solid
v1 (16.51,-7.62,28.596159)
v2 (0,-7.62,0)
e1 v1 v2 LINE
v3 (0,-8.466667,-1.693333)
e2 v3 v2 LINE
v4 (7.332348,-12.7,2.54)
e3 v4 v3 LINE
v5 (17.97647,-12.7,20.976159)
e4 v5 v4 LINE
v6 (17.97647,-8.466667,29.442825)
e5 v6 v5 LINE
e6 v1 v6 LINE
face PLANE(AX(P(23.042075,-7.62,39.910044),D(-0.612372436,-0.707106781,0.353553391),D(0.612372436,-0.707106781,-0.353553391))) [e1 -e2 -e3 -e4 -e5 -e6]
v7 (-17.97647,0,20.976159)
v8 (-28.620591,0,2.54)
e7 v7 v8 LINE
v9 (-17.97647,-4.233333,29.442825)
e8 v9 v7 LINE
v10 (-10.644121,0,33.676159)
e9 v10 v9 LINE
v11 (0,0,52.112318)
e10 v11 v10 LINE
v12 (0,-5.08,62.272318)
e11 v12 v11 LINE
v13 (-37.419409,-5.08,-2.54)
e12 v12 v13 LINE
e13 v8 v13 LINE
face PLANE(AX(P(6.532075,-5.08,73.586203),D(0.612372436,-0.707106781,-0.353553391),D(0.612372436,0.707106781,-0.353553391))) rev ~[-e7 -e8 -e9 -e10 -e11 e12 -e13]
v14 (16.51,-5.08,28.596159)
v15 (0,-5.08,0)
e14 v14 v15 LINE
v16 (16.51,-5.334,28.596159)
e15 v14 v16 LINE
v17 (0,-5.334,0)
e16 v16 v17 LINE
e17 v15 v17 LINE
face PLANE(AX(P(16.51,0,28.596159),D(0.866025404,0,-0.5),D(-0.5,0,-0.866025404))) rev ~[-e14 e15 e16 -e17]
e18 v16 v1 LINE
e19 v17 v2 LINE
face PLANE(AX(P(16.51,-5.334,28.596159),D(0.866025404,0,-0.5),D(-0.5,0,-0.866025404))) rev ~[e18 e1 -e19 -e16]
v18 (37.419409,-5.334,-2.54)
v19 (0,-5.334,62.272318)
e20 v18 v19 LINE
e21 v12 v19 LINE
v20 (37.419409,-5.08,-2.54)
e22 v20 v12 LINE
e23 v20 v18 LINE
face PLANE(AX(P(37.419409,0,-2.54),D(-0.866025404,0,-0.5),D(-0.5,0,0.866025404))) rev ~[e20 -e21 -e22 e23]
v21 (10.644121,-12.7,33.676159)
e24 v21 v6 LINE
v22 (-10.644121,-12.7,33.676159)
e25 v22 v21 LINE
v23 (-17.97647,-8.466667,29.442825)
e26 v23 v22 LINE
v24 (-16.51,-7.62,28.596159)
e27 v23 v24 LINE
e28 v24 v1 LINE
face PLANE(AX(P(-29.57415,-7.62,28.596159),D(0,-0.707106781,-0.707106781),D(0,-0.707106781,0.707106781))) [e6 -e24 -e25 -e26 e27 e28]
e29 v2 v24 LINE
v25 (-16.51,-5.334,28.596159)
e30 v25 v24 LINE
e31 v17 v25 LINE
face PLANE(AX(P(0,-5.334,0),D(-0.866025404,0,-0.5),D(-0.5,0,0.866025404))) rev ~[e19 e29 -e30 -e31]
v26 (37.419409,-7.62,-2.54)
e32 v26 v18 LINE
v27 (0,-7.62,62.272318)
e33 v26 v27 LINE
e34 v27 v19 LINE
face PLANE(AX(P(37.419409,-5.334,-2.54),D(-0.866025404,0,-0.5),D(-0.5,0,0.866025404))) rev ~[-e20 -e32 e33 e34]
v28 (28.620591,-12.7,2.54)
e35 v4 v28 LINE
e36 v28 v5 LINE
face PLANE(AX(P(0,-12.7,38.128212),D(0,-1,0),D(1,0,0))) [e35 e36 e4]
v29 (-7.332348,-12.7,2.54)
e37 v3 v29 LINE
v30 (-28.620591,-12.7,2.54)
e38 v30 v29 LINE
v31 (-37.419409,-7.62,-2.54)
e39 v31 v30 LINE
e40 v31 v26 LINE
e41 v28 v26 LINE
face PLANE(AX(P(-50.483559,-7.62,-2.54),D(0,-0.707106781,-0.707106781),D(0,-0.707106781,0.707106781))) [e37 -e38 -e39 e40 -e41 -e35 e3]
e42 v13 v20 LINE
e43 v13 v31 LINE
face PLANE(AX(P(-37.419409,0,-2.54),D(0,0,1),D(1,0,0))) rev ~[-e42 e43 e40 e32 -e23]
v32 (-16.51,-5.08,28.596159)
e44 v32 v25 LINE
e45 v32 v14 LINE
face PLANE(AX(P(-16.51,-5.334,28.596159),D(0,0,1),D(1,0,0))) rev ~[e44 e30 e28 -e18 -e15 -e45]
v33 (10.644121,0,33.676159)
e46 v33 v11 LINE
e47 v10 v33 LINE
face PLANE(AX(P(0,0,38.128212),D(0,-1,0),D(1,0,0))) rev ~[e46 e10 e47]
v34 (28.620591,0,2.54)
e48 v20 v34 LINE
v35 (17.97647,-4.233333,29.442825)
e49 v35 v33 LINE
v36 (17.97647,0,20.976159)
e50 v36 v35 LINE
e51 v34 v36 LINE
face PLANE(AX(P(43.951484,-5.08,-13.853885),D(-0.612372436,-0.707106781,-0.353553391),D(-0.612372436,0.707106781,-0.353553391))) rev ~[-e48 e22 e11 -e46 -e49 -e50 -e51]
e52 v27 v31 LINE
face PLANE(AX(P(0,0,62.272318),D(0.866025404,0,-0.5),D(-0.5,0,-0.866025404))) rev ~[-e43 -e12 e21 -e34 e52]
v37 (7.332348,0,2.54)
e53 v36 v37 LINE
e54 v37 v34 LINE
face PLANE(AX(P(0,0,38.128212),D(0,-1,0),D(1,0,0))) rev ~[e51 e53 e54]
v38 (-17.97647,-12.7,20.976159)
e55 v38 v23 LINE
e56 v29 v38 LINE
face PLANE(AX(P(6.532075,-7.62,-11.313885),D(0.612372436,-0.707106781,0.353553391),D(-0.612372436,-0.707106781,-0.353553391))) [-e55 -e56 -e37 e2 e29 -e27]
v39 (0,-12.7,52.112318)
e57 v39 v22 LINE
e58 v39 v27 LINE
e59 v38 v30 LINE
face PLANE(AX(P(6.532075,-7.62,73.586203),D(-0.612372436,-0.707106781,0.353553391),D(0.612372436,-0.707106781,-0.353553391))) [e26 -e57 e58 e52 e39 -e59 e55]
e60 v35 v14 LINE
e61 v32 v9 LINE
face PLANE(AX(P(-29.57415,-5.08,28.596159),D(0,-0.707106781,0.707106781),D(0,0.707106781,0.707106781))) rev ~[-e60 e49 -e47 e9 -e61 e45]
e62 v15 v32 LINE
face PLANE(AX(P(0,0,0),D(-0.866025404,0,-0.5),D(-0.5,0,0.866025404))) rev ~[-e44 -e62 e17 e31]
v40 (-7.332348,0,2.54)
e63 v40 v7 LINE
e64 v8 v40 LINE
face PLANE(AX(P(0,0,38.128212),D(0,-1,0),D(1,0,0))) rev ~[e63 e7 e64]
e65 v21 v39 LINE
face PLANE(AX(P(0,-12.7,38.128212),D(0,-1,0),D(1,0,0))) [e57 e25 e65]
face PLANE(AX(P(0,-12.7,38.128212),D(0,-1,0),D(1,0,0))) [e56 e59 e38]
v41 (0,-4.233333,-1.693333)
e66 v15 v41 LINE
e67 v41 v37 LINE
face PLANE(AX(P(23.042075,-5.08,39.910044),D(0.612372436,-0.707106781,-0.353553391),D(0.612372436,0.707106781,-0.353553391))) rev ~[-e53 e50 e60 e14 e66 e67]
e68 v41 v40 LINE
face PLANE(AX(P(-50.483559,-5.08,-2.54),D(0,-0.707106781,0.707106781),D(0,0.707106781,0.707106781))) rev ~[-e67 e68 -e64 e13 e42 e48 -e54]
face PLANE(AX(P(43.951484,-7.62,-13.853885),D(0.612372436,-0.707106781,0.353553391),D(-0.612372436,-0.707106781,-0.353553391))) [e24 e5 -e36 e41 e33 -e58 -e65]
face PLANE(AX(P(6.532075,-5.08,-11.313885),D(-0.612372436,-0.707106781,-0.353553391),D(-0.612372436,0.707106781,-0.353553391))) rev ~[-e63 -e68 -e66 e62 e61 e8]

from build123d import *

# Parameters (mm, degrees)
F1_DEPTH      = 12.7
F2_T1_DEPTH   = 100.9671172602
F2_T3_DEPTH   = 100.9671172602
F2_T5_DEPTH   = 100.9671172602
F2_T10_DEPTH  = 59.1482991577
F2_T16_DEPTH  = 59.1482991577
F2_T22_DEPTH  = 59.1482991577
F2_T28_DEPTH  = 59.1482991577
F2_T34_DEPTH  = 59.1482991577
F2_T40_DEPTH  = 59.1482991577
F2_T47_DEPTH  = 59.1482991577
F2_T52_DEPTH  = 59.1482991577
F2_T60_DEPTH  = 59.1482991577
F2_T65_DEPTH  = 59.1482991577
F2_T73_DEPTH  = 59.1482991577
F2_T78_DEPTH  = 59.1482991577
F2_T86_DEPTH  = 59.1482991577
F2_T91_DEPTH  = 59.1482991577
F2_T99_DEPTH  = 59.1482991577
F2_T104_DEPTH = 59.1482991577
F2_T112_DEPTH = 59.1482991577
F2_T117_DEPTH = 59.1482991577
F3_DEPTH      = 2.286
F4_DEPTH      = 2.286


# Not quite as in the source:
# - a fillet or chamfer that OpenCascade refuses, or shapes differently, is made with other operations: its cross-section is extruded or revolved along the edge and cut away or added


with BuildPart() as f1:
    # F0 (on Front) → F1 (new body)
    with BuildSketch(Plane.XZ):
        Polygon((0, 57.1923176659), (-16.51, 28.596158833), (16.51, 28.596158833), align=None)
        Polygon((-33.02, 0), (0, 0), (-16.51, 28.596158833), align=None)
        Polygon((16.51, 28.596158833), (0, 0), (33.02, 0), align=None)
        Polygon((-37.4194090512, -2.54), (-33.02, 0), (-16.51, 28.596158833), (0, 57.1923176659), (0, 62.2723176659), align=None)
        Polygon((16.51, 28.596158833), (33.02, 0), (37.4194090512, -2.54), (0, 62.2723176659), (0, 57.1923176659), align=None)
        Polygon((33.02, 0), (0, 0), (-33.02, 0), (-37.4194090512, -2.54), (37.4194090512, -2.54), align=None)
    extrude(amount=F1_DEPTH)

    # F2: chamfer of 5.08 on 12 edges, made by hand

    # F2_s2 → F2_t1 (cut)
    with BuildSketch(Plane(origin=(33.496779315, 0, 58.0181236636), x_dir=(0, 1, 0), z_dir=(-0.5, 0, -0.8660254038))):
        Polygon((-7.62, -31.136158833), (-12.7, -26.056158833), (-12.7, -31.136158833), align=None)
        Polygon((-5.08, -31.136158833), (0, -26.056158833), (0, -31.136158833), align=None)
    extrude(amount=F2_T1_DEPTH, mode=Mode.SUBTRACT)

    # F2_s4 → F2_t3 (cut)
    with BuildSketch(Plane(origin=(16.986779315, 0, -29.4219648306), x_dir=(0, 1, 0), z_dir=(-0.5, 0, 0.8660254038))):
        Polygon((-7.62, -31.136158833), (-12.7, -26.056158833), (-12.7, -31.136158833), align=None)
        Polygon((-5.08, -31.136158833), (0, -26.056158833), (0, -31.136158833), align=None)
    extrude(amount=F2_T3_DEPTH, mode=Mode.SUBTRACT)

    # F2_s6 → F2_t5 (cut)
    with BuildSketch(Plane.YZ.offset(-50.4835586301)):
        Polygon((-7.62, -2.54), (-12.7, 2.54), (-12.7, -2.54), align=None)
        Polygon((-5.08, -2.54), (0, 2.54), (0, -2.54), align=None)
    extrude(amount=F2_T5_DEPTH, mode=Mode.SUBTRACT)


with BuildPart() as f2_tool8:
    # F2_s9 → F2_t10 (new body)
    with BuildSketch(Plane(origin=(6.5320747894, 0, -11.3138854141), x_dir=(0, 1, 0), z_dir=(-0.5, 0, 0.8660254038))):
        Polygon((-7.62, 0), (-12.7, 5.08), (-12.7, 0), align=None)
    extrude(amount=F2_T10_DEPTH)

    split(bisect_by=Plane(origin=(0, 0, 0), x_dir=(0, 1, 0), z_dir=(-0.8660254038, 0, 0.5)), keep=Keep.TOP)

    split(bisect_by=Plane.XY.offset(28.596158833), keep=Keep.BOTTOM)


with BuildPart() as f1_1:
    add(f1.part)

    # F2_t7: cut F2_tool8
    add(f2_tool8.part, mode=Mode.SUBTRACT)


with BuildPart() as f2_tool14:
    # F2_s15 → F2_t16 (new body)
    with BuildSketch(Plane.YZ.offset(-29.5741495789)):
        Polygon((-7.62, 28.596158833), (-12.7, 33.676158833), (-12.7, 28.596158833), align=None)
    extrude(amount=F2_T16_DEPTH)

    split(bisect_by=Plane(origin=(0, 0, 0), x_dir=(0, 1, 0), z_dir=(-0.8660254038, 0, 0.5)), keep=Keep.TOP)

    split(bisect_by=Plane(origin=(0, 0, 0), x_dir=(0, 1, 0), z_dir=(0.8660254038, 0, 0.5)), keep=Keep.TOP)


with BuildPart() as f1_2:
    add(f1_1.part)

    # F2_t13: cut F2_tool14
    add(f2_tool14.part, mode=Mode.SUBTRACT)


with BuildPart() as f2_tool20:
    # F2_s21 → F2_t22 (new body)
    with BuildSketch(Plane(origin=(23.0420747894, 0, 39.9100442471), x_dir=(0, 1, 0), z_dir=(-0.5, 0, -0.8660254038))):
        Polygon((-7.62, 0), (-12.7, 5.08), (-12.7, 0), align=None)
    extrude(amount=F2_T22_DEPTH)

    split(bisect_by=Plane(origin=(0, 0, 0), x_dir=(0, 1, 0), z_dir=(0.8660254038, 0, 0.5)), keep=Keep.TOP)

    split(bisect_by=Plane.XY.offset(28.596158833), keep=Keep.BOTTOM)


with BuildPart() as f1_3:
    add(f1_2.part)

    # F2_t19: cut F2_tool20
    add(f2_tool20.part, mode=Mode.SUBTRACT)


with BuildPart() as f2_tool26:
    # F2_s27 → F2_t28 (new body)
    with BuildSketch(Plane(origin=(23.0420747894, 0, 39.9100442471), x_dir=(0, 1, 0), z_dir=(-0.5, 0, -0.8660254038))):
        Polygon((-5.08, 0), (0, 5.08), (0, 0), align=None)
    extrude(amount=F2_T28_DEPTH)

    split(bisect_by=Plane(origin=(0, 0, 0), x_dir=(0, 1, 0), z_dir=(0.8660254038, 0, 0.5)), keep=Keep.TOP)

    split(bisect_by=Plane.XY.offset(28.596158833), keep=Keep.BOTTOM)


with BuildPart() as f1_4:
    add(f1_3.part)

    # F2_t25: cut F2_tool26
    add(f2_tool26.part, mode=Mode.SUBTRACT)


with BuildPart() as f2_tool32:
    # F2_s33 → F2_t34 (new body)
    with BuildSketch(Plane.YZ.offset(-29.5741495789)):
        Polygon((-5.08, 28.596158833), (0, 33.676158833), (0, 28.596158833), align=None)
    extrude(amount=F2_T34_DEPTH)

    split(bisect_by=Plane(origin=(0, 0, 0), x_dir=(0, 1, 0), z_dir=(-0.8660254038, 0, 0.5)), keep=Keep.TOP)

    split(bisect_by=Plane(origin=(0, 0, 0), x_dir=(0, 1, 0), z_dir=(0.8660254038, 0, 0.5)), keep=Keep.TOP)


with BuildPart() as f1_5:
    add(f1_4.part)

    # F2_t31: cut F2_tool32
    add(f2_tool32.part, mode=Mode.SUBTRACT)


with BuildPart() as f2_tool38:
    # F2_s39 → F2_t40 (new body)
    with BuildSketch(Plane(origin=(6.5320747894, 0, -11.3138854141), x_dir=(0, 1, 0), z_dir=(-0.5, 0, 0.8660254038))):
        Polygon((-5.08, 0), (0, 5.08), (0, 0), align=None)
    extrude(amount=F2_T40_DEPTH)

    split(bisect_by=Plane(origin=(0, 0, 0), x_dir=(0, 1, 0), z_dir=(-0.8660254038, 0, 0.5)), keep=Keep.TOP)

    split(bisect_by=Plane.XY.offset(28.596158833), keep=Keep.BOTTOM)


with BuildPart() as f1_6:
    add(f1_5.part)

    # F2_t37: cut F2_tool38
    add(f2_tool38.part, mode=Mode.SUBTRACT)


with BuildPart() as f2_tool45:
    # F2_s46 → F2_t47 (new body)
    with BuildSketch(Plane(origin=(23.0420747894, 0, 39.9100442471), x_dir=(0, 1, 0), z_dir=(-0.5, 0, -0.8660254038))):
        Polygon((-7.62, 0), (-12.7, 5.08), (-12.7, 0), align=None)
    extrude(amount=F2_T47_DEPTH)

    split(bisect_by=Plane.XY.offset(-2.54), keep=Keep.TOP)

    split(bisect_by=Plane(origin=(0, 0, 0), x_dir=(0, 1, 0), z_dir=(-0.8660254038, 0, -0.5)), keep=Keep.TOP)


with BuildPart() as f2_tool50:
    # F2_s51 → F2_t52 (new body)
    with BuildSketch(Plane(origin=(6.5320747894, 0, -11.3138854141), x_dir=(0, 1, 0), z_dir=(-0.5, 0, 0.8660254038))):
        Polygon((-7.62, 0), (-12.7, 5.08), (-12.7, 0), align=None)
    extrude(amount=F2_T52_DEPTH)

    split(bisect_by=Plane.XY.offset(-2.54), keep=Keep.TOP)

    split(bisect_by=Plane(origin=(0, 0, 0), x_dir=(0, 1, 0), z_dir=(0.8660254038, 0, -0.5)), keep=Keep.TOP)


with BuildPart() as f2_tool45_1:
    add(f2_tool45.part)

    # F2_t55: intersect F2_tool50
    add(f2_tool50.part, mode=Mode.INTERSECT)


with BuildPart() as f1_7:
    add(f1_6.part)

    # F2_t43: cut F2_tool45
    add(f2_tool45_1.part, mode=Mode.SUBTRACT)


with BuildPart() as f2_tool58:
    # F2_s59 → F2_t60 (new body)
    with BuildSketch(Plane(origin=(6.5320747894, 0, -11.3138854141), x_dir=(0, 1, 0), z_dir=(-0.5, 0, 0.8660254038))):
        Polygon((-7.62, 0), (-12.7, 5.08), (-12.7, 0), align=None)
    extrude(amount=F2_T60_DEPTH)

    split(bisect_by=Plane(origin=(-26.9647045256, 0, 15.5680794165), x_dir=(0, 1, 0), z_dir=(0.8660254038, 0, -0.5)), keep=Keep.TOP)

    split(bisect_by=Plane.XY.offset(28.596158833), keep=Keep.TOP)


with BuildPart() as f2_tool63:
    # F2_s64 → F2_t65 (new body)
    with BuildSketch(Plane.YZ.offset(-29.5741495789)):
        Polygon((-7.62, 28.596158833), (-12.7, 33.676158833), (-12.7, 28.596158833), align=None)
    extrude(amount=F2_T65_DEPTH)

    split(bisect_by=Plane(origin=(-26.9647045256, 0, 15.5680794165), x_dir=(0, 1, 0), z_dir=(0.8660254038, 0, -0.5)), keep=Keep.TOP)

    split(bisect_by=Plane(origin=(0, 0, 0), x_dir=(0, 1, 0), z_dir=(-0.8660254038, 0, -0.5)), keep=Keep.TOP)


with BuildPart() as f2_tool58_1:
    add(f2_tool58.part)

    # F2_t68: intersect F2_tool63
    add(f2_tool63.part, mode=Mode.INTERSECT)


with BuildPart() as f1_8:
    add(f1_7.part)

    # F2_t56: cut F2_tool58
    add(f2_tool58_1.part, mode=Mode.SUBTRACT)


with BuildPart() as f2_tool71:
    # F2_s72 → F2_t73 (new body)
    with BuildSketch(Plane(origin=(23.0420747894, 0, 39.9100442471), x_dir=(0, 1, 0), z_dir=(-0.5, 0, -0.8660254038))):
        Polygon((-7.62, 0), (-12.7, 5.08), (-12.7, 0), align=None)
    extrude(amount=F2_T73_DEPTH)

    split(bisect_by=Plane(origin=(26.9647045256, 0, 15.5680794165), x_dir=(0, 1, 0), z_dir=(-0.8660254038, 0, -0.5)), keep=Keep.TOP)

    split(bisect_by=Plane.XY.offset(28.596158833), keep=Keep.TOP)


with BuildPart() as f2_tool76:
    # F2_s77 → F2_t78 (new body)
    with BuildSketch(Plane.YZ.offset(-29.5741495789)):
        Polygon((-7.62, 28.596158833), (-12.7, 33.676158833), (-12.7, 28.596158833), align=None)
    extrude(amount=F2_T78_DEPTH)

    split(bisect_by=Plane(origin=(26.9647045256, 0, 15.5680794165), x_dir=(0, 1, 0), z_dir=(-0.8660254038, 0, -0.5)), keep=Keep.TOP)

    split(bisect_by=Plane(origin=(0, 0, 0), x_dir=(0, 1, 0), z_dir=(0.8660254038, 0, -0.5)), keep=Keep.TOP)


with BuildPart() as f2_tool71_1:
    add(f2_tool71.part)

    # F2_t81: intersect F2_tool76
    add(f2_tool76.part, mode=Mode.INTERSECT)


with BuildPart() as f1_9:
    add(f1_8.part)

    # F2_t69: cut F2_tool71
    add(f2_tool71_1.part, mode=Mode.SUBTRACT)


with BuildPart() as f2_tool84:
    # F2_s85 → F2_t86 (new body)
    with BuildSketch(Plane(origin=(23.0420747894, 0, 39.9100442471), x_dir=(0, 1, 0), z_dir=(-0.5, 0, -0.8660254038))):
        Polygon((-5.08, 0), (0, 5.08), (0, 0), align=None)
    extrude(amount=F2_T86_DEPTH)

    split(bisect_by=Plane(origin=(26.9647045256, 0, 15.5680794165), x_dir=(0, 1, 0), z_dir=(-0.8660254038, 0, -0.5)), keep=Keep.TOP)

    split(bisect_by=Plane.XY.offset(28.596158833), keep=Keep.TOP)


with BuildPart() as f2_tool89:
    # F2_s90 → F2_t91 (new body)
    with BuildSketch(Plane.YZ.offset(-29.5741495789)):
        Polygon((-5.08, 28.596158833), (0, 33.676158833), (0, 28.596158833), align=None)
    extrude(amount=F2_T91_DEPTH)

    split(bisect_by=Plane(origin=(26.9647045256, 0, 15.5680794165), x_dir=(0, 1, 0), z_dir=(-0.8660254038, 0, -0.5)), keep=Keep.TOP)

    split(bisect_by=Plane(origin=(0, 0, 0), x_dir=(0, 1, 0), z_dir=(0.8660254038, 0, -0.5)), keep=Keep.TOP)


with BuildPart() as f2_tool84_1:
    add(f2_tool84.part)

    # F2_t94: intersect F2_tool89
    add(f2_tool89.part, mode=Mode.INTERSECT)


with BuildPart() as f1_10:
    add(f1_9.part)

    # F2_t82: cut F2_tool84
    add(f2_tool84_1.part, mode=Mode.SUBTRACT)


with BuildPart() as f2_tool97:
    # F2_s98 → F2_t99 (new body)
    with BuildSketch(Plane(origin=(23.0420747894, 0, 39.9100442471), x_dir=(0, 1, 0), z_dir=(-0.5, 0, -0.8660254038))):
        Polygon((-5.08, 0), (0, 5.08), (0, 0), align=None)
    extrude(amount=F2_T99_DEPTH)

    split(bisect_by=Plane.XY.offset(-2.54), keep=Keep.TOP)

    split(bisect_by=Plane(origin=(0, 0, 0), x_dir=(0, 1, 0), z_dir=(-0.8660254038, 0, -0.5)), keep=Keep.TOP)


with BuildPart() as f2_tool102:
    # F2_s103 → F2_t104 (new body)
    with BuildSketch(Plane(origin=(6.5320747894, 0, -11.3138854141), x_dir=(0, 1, 0), z_dir=(-0.5, 0, 0.8660254038))):
        Polygon((-5.08, 0), (0, 5.08), (0, 0), align=None)
    extrude(amount=F2_T104_DEPTH)

    split(bisect_by=Plane.XY.offset(-2.54), keep=Keep.TOP)

    split(bisect_by=Plane(origin=(0, 0, 0), x_dir=(0, 1, 0), z_dir=(0.8660254038, 0, -0.5)), keep=Keep.TOP)


with BuildPart() as f2_tool97_1:
    add(f2_tool97.part)

    # F2_t107: intersect F2_tool102
    add(f2_tool102.part, mode=Mode.INTERSECT)


with BuildPart() as f1_11:
    add(f1_10.part)

    # F2_t95: cut F2_tool97
    add(f2_tool97_1.part, mode=Mode.SUBTRACT)


with BuildPart() as f2_tool110:
    # F2_s111 → F2_t112 (new body)
    with BuildSketch(Plane(origin=(6.5320747894, 0, -11.3138854141), x_dir=(0, 1, 0), z_dir=(-0.5, 0, 0.8660254038))):
        Polygon((-5.08, 0), (0, 5.08), (0, 0), align=None)
    extrude(amount=F2_T112_DEPTH)

    split(bisect_by=Plane(origin=(-26.9647045256, 0, 15.5680794165), x_dir=(0, 1, 0), z_dir=(0.8660254038, 0, -0.5)), keep=Keep.TOP)

    split(bisect_by=Plane.XY.offset(28.596158833), keep=Keep.TOP)


with BuildPart() as f2_tool115:
    # F2_s116 → F2_t117 (new body)
    with BuildSketch(Plane.YZ.offset(-29.5741495789)):
        Polygon((-5.08, 28.596158833), (0, 33.676158833), (0, 28.596158833), align=None)
    extrude(amount=F2_T117_DEPTH)

    split(bisect_by=Plane(origin=(-26.9647045256, 0, 15.5680794165), x_dir=(0, 1, 0), z_dir=(0.8660254038, 0, -0.5)), keep=Keep.TOP)

    split(bisect_by=Plane(origin=(0, 0, 0), x_dir=(0, 1, 0), z_dir=(-0.8660254038, 0, -0.5)), keep=Keep.TOP)


with BuildPart() as f2_tool110_1:
    add(f2_tool110.part)

    # F2_t120: intersect F2_tool115
    add(f2_tool115.part, mode=Mode.INTERSECT)


with BuildPart() as f1_12:
    add(f1_11.part)

    # F2_t108: cut F2_tool110
    add(f2_tool110_1.part, mode=Mode.SUBTRACT)

    # F3 (cut): faces of the model
    f3_faces = [f1_12.faces().sort_by_distance(p)[0] for p in [
        (-17.9764696838, -12.7, 8.6853862777),
        (-10.2690242997, -9.9455949432, 13.1352819449),
        (0, -9.9455949432, 30.9217537762),
        (-17.9764696838, -12.7, 8.6853862777),
        (10.2690242997, -9.9455949432, 13.1352819449),
        (-17.9764696838, -12.7, 8.6853862777),
        (10.2690242997, -9.9455949432, 13.1352819449),
        (23.7578772071, -12.1695918979, 12.0232834675),
        (-10.2690242997, -9.9455949432, 13.1352819449),
    ]]
    extrude(f3_faces, amount=-F3_DEPTH, dir=(0, -1, 0), mode=Mode.SUBTRACT)

    # F4 (add): faces of the model
    f4_faces = [f1_12.faces().sort_by_distance(p)[0] for p in [
        (-17.9764696838, -10.414, 8.6853862777),
        (-17.9764696838, -10.414, 8.6853862777),
        (-10.2690242997, -7.6595949432, 13.1352819449),
        (-17.9764696838, -10.414, 8.6853862777),
        (10.2690242997, -7.6595949432, 13.1352819449),
        (-10.2690242997, -7.6595949432, 13.1352819449),
        (0, -7.6595949432, 30.9217537762),
        (10.2690242997, -7.6595949432, 13.1352819449),
        (23.7578772071, -9.8835918979, 12.0232834675),
    ]]
    extrude(f4_faces, amount=F4_DEPTH, dir=(0, -1, 0))


solid = f1_12.part
